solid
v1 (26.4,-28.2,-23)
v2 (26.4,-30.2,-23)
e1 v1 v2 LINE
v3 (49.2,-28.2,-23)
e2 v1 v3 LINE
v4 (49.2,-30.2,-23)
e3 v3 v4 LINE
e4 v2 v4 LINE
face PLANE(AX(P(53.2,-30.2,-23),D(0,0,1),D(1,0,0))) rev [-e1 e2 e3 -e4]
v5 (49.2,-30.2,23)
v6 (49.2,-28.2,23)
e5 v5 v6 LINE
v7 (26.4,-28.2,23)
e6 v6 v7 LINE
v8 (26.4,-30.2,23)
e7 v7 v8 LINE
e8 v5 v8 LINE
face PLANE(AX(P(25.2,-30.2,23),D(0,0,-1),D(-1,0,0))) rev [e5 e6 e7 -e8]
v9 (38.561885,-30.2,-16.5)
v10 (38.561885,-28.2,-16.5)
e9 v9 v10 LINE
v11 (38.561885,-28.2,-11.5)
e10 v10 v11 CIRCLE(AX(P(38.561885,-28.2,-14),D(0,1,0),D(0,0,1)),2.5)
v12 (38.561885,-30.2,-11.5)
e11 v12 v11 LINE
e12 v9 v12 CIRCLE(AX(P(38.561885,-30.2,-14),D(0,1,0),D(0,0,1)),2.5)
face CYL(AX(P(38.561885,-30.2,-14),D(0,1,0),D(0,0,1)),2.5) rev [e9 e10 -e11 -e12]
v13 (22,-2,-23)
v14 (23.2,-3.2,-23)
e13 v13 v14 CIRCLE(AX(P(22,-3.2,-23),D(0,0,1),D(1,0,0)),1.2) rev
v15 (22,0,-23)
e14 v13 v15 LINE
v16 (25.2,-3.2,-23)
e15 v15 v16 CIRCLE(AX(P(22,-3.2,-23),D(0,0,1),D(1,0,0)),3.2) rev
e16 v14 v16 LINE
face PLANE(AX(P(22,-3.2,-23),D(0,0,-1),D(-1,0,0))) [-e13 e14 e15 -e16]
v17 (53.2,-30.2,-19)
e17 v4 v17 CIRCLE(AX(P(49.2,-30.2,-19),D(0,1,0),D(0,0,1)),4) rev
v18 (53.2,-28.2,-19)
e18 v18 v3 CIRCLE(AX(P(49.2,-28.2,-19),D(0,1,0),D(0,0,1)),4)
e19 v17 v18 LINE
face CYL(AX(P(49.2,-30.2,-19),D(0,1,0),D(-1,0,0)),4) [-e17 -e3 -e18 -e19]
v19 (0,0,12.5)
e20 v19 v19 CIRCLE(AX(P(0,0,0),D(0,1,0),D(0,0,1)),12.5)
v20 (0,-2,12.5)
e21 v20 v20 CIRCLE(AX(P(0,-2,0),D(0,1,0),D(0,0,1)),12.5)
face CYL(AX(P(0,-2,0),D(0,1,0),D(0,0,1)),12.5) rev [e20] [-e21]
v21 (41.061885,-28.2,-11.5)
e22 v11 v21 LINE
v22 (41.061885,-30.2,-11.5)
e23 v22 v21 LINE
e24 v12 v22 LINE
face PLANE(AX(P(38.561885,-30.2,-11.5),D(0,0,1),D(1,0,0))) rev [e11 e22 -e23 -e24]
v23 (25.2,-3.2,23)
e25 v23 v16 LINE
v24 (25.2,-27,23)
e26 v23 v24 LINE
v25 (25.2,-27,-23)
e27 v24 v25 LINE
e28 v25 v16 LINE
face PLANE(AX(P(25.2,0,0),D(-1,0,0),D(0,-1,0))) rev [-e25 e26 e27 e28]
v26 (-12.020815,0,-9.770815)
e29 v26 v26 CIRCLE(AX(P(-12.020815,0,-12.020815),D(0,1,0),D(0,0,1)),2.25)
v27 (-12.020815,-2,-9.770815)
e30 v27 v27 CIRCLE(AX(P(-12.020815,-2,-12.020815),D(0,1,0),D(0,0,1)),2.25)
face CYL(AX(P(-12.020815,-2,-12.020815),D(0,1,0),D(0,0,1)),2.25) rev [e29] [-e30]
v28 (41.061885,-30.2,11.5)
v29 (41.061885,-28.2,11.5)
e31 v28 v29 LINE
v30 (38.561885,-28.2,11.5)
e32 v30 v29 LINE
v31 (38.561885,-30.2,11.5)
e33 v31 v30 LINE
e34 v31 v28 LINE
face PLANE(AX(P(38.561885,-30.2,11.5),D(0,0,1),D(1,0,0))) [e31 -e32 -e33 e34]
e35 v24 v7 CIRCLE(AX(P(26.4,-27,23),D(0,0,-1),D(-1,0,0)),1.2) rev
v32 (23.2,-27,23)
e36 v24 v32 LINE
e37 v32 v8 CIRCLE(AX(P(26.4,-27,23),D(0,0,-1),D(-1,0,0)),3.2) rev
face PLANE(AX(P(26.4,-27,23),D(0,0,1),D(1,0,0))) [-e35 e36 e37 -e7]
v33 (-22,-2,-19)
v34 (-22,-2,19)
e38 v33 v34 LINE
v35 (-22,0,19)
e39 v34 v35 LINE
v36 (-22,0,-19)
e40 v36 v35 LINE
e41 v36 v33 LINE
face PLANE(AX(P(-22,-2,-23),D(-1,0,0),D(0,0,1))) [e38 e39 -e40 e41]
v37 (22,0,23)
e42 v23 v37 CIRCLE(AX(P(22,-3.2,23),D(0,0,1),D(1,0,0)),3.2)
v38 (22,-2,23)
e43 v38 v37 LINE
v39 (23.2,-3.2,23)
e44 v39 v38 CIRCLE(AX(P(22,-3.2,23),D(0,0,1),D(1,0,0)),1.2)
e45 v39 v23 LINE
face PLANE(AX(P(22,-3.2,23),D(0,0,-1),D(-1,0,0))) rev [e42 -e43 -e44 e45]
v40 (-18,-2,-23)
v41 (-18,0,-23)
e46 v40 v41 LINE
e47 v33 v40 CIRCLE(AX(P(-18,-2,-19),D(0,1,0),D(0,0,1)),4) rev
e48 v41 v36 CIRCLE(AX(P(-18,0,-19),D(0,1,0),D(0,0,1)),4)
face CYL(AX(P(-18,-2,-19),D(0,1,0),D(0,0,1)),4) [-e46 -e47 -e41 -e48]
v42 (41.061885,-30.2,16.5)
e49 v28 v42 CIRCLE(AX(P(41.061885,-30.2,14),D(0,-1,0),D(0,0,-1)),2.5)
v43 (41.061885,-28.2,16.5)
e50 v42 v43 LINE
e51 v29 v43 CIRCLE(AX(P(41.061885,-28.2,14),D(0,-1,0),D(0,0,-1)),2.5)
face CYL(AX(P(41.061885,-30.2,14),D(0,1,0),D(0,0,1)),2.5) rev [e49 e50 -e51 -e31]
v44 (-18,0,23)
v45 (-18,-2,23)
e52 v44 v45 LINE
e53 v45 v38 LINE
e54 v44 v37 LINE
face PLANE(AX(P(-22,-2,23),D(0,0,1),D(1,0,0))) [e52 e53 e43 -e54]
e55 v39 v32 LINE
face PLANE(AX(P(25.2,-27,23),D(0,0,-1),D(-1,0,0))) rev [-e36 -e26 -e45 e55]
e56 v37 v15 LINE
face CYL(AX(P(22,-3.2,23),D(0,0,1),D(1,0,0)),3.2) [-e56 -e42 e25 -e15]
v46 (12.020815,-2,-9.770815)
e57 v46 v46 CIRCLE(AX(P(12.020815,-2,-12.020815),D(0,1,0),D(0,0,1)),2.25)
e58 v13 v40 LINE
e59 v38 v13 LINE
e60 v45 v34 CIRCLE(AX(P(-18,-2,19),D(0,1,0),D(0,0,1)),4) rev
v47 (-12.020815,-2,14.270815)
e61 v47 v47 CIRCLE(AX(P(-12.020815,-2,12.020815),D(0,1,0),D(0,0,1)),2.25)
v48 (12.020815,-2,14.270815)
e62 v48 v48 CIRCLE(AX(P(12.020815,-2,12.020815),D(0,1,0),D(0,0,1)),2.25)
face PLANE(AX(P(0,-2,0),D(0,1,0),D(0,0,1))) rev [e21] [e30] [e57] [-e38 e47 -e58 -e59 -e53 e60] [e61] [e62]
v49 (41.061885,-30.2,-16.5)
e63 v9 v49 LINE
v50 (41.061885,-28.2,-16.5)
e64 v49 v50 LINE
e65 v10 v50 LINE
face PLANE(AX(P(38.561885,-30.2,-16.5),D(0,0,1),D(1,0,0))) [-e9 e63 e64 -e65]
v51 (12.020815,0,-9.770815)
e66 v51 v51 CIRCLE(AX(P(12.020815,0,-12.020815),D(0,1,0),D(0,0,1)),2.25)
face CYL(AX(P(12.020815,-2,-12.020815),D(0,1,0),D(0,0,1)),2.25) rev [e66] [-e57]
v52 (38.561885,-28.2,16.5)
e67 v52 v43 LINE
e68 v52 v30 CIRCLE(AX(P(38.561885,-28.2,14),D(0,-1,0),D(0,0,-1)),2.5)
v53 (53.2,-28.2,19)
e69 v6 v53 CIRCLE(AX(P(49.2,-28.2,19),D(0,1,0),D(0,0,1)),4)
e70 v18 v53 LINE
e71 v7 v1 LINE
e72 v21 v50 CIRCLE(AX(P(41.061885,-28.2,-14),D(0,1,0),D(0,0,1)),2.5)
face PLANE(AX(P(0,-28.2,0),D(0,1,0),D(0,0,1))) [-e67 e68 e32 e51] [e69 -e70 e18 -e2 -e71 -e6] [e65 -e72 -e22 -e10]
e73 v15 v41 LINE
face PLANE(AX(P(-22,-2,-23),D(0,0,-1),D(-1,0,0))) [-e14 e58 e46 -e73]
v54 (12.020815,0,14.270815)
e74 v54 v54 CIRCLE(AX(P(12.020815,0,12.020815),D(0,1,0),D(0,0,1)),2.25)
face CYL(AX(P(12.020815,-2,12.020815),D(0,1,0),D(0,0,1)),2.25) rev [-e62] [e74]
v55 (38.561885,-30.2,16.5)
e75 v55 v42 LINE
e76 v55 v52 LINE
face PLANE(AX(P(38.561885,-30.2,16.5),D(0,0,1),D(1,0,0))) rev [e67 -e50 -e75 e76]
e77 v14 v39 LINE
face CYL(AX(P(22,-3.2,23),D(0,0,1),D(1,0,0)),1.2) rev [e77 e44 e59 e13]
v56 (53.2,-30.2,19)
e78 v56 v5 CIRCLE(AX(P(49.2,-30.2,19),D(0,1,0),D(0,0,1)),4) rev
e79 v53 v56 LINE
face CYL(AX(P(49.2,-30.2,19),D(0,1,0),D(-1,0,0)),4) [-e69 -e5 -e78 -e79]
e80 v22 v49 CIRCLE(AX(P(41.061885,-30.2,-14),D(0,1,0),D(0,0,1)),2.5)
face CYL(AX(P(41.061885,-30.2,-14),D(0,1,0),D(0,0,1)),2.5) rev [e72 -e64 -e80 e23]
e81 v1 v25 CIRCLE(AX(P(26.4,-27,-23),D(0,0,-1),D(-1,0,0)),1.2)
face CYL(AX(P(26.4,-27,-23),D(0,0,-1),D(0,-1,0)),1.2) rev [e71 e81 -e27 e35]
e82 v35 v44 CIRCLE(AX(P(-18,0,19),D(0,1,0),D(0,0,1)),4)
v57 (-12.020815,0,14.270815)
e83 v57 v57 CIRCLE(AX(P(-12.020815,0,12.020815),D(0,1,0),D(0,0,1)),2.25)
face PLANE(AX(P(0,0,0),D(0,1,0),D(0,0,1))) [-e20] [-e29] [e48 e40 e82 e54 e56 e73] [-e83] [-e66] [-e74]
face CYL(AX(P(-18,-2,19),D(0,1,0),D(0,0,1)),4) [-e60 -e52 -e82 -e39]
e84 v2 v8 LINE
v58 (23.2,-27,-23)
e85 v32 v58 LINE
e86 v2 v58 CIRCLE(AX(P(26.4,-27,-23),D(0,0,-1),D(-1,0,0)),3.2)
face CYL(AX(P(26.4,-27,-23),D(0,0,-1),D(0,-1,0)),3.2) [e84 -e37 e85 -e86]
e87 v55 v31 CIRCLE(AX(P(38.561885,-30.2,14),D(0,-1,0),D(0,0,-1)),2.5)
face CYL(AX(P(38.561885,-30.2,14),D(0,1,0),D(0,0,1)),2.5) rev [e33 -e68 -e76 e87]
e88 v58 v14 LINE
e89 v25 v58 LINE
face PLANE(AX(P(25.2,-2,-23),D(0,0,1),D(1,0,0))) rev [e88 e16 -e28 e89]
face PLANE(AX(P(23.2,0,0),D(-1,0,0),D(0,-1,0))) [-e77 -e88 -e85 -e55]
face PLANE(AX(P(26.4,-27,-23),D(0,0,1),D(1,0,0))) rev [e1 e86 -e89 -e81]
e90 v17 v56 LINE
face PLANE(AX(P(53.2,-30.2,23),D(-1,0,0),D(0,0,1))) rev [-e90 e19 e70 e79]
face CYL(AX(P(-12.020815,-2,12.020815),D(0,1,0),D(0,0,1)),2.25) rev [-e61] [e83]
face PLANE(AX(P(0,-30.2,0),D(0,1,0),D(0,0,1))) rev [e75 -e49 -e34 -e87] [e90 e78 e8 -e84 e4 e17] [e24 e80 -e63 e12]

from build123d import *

# Parameters (mm, degrees)
SKETCH1_W          = 44
SKETCH1_H          = 46
SKETCH1_R          = 12.5
SKETCH1_R_2        = 2.25
BASE_FLANGE1_DEPTH = 2
EDGE_FLANGE1_DEPTH = 46
EDGE_FLANGE2_DEPTH = 46
CUT_EXTRUDE1_DEPTH = 2
FILLET1_R          = 4


# Sheet-metal steps are written as plain solids
with BuildPart() as part:
    # Sketch1 → Base-Flange1 (new body)
    with BuildSketch(Plane(origin=(0, 0, 0), x_dir=(1, 0, 0), z_dir=(0, 1, 0))):
        Rectangle(SKETCH1_W, SKETCH1_H)
        with Locations(Location((0, 0, 0), (0, 0, 270))):
            Circle(SKETCH1_R, mode=Mode.SUBTRACT)
        with Locations(Location((12.02081528, 12.02081528, 0), (0, 0, 270))):
            Circle(SKETCH1_R_2, mode=Mode.SUBTRACT)
        with Locations(Location((12.02081528, -12.02081528, 0), (0, 0, 270))):
            Circle(SKETCH1_R_2, mode=Mode.SUBTRACT)
        with Locations(Location((-12.02081528, -12.02081528, 0), (0, 0, 270))):
            Circle(SKETCH1_R_2, mode=Mode.SUBTRACT)
        with Locations(Location((-12.02081528, 12.02081528, 0), (0, 0, 270))):
            Circle(SKETCH1_R_2, mode=Mode.SUBTRACT)
    extrude(amount=-BASE_FLANGE1_DEPTH)

    # Edge-Flange1 section (across the edge) → Edge-Flange1 (add)
    with BuildSketch(Plane(origin=(23.2, -2, -23), x_dir=(-1, 0, 0), z_dir=(0, 0, 1))):
        with BuildLine():
            Line((-2, 1.2), (-2, 25))
            Line((-2, 25), (0, 25))
            Line((0, 25), (0, 1.2))
            ThreePointArc((0, 1.2), (0.351471863, 0.351471863), (1.2, 0))
            Line((1.2, 0), (1.2, -2))
            ThreePointArc((1.2, -2), (-1.0627417, -1.0627417), (-2, 1.2))
        make_face()
    extrude(amount=EDGE_FLANGE1_DEPTH)

    # Edge-Flange2 section (across the edge) → Edge-Flange2 (add)
    with BuildSketch(Plane(origin=(25.2, -28.2, 23), x_dir=(0, 1, 0), z_dir=(0, 0, -1))):
        with BuildLine():
            Line((-2, 1.2), (-2, 28))
            Line((-2, 28), (0, 28))
            Line((0, 28), (0, 1.2))
            ThreePointArc((0, 1.2), (0.351471863, 0.351471863), (1.2, 0))
            Line((1.2, 0), (1.2, -2))
            ThreePointArc((1.2, -2), (-1.0627417, -1.0627417), (-2, 1.2))
        make_face()
    extrude(amount=EDGE_FLANGE2_DEPTH)

    # Sketch12 → Cut-Extrude1 (cut)
    with BuildSketch(Plane(origin=(0, -28.2, 0), x_dir=(1, 0, 0), z_dir=(0, 1, 0))):
        with BuildLine():
            Line((38.561884659, 16.5), (41.061884659, 16.5))
            ThreePointArc((41.061884659, 16.5), (43.561884659, 14), (41.061884659, 11.5))
            Line((41.061884659, 11.5), (38.561884659, 11.5))
            ThreePointArc((38.561884659, 11.5), (36.061884659, 14), (38.561884659, 16.5))
        make_face()
        with BuildLine():
            Line((38.561884659, -16.5), (41.061884659, -16.5))
            ThreePointArc((41.061884659, -16.5), (43.561884659, -14), (41.061884659, -11.5))
            Line((41.061884659, -11.5), (38.561884659, -11.5))
            ThreePointArc((38.561884659, -11.5), (36.061884659, -14), (38.561884659, -16.5))
        make_face()
    extrude(amount=-CUT_EXTRUDE1_DEPTH, mode=Mode.SUBTRACT)

    # Fillet1
    fillet1_edges = [part.edges().sort_by_distance(p)[0] for p in [
        (53.2, -29.2, 23),
        (53.2, -29.2, -23),
        (-22, -1, 23),
        (-22, -1, -23),
    ]]
    fillet(fillet1_edges, radius=FILLET1_R)


solid = part.part
